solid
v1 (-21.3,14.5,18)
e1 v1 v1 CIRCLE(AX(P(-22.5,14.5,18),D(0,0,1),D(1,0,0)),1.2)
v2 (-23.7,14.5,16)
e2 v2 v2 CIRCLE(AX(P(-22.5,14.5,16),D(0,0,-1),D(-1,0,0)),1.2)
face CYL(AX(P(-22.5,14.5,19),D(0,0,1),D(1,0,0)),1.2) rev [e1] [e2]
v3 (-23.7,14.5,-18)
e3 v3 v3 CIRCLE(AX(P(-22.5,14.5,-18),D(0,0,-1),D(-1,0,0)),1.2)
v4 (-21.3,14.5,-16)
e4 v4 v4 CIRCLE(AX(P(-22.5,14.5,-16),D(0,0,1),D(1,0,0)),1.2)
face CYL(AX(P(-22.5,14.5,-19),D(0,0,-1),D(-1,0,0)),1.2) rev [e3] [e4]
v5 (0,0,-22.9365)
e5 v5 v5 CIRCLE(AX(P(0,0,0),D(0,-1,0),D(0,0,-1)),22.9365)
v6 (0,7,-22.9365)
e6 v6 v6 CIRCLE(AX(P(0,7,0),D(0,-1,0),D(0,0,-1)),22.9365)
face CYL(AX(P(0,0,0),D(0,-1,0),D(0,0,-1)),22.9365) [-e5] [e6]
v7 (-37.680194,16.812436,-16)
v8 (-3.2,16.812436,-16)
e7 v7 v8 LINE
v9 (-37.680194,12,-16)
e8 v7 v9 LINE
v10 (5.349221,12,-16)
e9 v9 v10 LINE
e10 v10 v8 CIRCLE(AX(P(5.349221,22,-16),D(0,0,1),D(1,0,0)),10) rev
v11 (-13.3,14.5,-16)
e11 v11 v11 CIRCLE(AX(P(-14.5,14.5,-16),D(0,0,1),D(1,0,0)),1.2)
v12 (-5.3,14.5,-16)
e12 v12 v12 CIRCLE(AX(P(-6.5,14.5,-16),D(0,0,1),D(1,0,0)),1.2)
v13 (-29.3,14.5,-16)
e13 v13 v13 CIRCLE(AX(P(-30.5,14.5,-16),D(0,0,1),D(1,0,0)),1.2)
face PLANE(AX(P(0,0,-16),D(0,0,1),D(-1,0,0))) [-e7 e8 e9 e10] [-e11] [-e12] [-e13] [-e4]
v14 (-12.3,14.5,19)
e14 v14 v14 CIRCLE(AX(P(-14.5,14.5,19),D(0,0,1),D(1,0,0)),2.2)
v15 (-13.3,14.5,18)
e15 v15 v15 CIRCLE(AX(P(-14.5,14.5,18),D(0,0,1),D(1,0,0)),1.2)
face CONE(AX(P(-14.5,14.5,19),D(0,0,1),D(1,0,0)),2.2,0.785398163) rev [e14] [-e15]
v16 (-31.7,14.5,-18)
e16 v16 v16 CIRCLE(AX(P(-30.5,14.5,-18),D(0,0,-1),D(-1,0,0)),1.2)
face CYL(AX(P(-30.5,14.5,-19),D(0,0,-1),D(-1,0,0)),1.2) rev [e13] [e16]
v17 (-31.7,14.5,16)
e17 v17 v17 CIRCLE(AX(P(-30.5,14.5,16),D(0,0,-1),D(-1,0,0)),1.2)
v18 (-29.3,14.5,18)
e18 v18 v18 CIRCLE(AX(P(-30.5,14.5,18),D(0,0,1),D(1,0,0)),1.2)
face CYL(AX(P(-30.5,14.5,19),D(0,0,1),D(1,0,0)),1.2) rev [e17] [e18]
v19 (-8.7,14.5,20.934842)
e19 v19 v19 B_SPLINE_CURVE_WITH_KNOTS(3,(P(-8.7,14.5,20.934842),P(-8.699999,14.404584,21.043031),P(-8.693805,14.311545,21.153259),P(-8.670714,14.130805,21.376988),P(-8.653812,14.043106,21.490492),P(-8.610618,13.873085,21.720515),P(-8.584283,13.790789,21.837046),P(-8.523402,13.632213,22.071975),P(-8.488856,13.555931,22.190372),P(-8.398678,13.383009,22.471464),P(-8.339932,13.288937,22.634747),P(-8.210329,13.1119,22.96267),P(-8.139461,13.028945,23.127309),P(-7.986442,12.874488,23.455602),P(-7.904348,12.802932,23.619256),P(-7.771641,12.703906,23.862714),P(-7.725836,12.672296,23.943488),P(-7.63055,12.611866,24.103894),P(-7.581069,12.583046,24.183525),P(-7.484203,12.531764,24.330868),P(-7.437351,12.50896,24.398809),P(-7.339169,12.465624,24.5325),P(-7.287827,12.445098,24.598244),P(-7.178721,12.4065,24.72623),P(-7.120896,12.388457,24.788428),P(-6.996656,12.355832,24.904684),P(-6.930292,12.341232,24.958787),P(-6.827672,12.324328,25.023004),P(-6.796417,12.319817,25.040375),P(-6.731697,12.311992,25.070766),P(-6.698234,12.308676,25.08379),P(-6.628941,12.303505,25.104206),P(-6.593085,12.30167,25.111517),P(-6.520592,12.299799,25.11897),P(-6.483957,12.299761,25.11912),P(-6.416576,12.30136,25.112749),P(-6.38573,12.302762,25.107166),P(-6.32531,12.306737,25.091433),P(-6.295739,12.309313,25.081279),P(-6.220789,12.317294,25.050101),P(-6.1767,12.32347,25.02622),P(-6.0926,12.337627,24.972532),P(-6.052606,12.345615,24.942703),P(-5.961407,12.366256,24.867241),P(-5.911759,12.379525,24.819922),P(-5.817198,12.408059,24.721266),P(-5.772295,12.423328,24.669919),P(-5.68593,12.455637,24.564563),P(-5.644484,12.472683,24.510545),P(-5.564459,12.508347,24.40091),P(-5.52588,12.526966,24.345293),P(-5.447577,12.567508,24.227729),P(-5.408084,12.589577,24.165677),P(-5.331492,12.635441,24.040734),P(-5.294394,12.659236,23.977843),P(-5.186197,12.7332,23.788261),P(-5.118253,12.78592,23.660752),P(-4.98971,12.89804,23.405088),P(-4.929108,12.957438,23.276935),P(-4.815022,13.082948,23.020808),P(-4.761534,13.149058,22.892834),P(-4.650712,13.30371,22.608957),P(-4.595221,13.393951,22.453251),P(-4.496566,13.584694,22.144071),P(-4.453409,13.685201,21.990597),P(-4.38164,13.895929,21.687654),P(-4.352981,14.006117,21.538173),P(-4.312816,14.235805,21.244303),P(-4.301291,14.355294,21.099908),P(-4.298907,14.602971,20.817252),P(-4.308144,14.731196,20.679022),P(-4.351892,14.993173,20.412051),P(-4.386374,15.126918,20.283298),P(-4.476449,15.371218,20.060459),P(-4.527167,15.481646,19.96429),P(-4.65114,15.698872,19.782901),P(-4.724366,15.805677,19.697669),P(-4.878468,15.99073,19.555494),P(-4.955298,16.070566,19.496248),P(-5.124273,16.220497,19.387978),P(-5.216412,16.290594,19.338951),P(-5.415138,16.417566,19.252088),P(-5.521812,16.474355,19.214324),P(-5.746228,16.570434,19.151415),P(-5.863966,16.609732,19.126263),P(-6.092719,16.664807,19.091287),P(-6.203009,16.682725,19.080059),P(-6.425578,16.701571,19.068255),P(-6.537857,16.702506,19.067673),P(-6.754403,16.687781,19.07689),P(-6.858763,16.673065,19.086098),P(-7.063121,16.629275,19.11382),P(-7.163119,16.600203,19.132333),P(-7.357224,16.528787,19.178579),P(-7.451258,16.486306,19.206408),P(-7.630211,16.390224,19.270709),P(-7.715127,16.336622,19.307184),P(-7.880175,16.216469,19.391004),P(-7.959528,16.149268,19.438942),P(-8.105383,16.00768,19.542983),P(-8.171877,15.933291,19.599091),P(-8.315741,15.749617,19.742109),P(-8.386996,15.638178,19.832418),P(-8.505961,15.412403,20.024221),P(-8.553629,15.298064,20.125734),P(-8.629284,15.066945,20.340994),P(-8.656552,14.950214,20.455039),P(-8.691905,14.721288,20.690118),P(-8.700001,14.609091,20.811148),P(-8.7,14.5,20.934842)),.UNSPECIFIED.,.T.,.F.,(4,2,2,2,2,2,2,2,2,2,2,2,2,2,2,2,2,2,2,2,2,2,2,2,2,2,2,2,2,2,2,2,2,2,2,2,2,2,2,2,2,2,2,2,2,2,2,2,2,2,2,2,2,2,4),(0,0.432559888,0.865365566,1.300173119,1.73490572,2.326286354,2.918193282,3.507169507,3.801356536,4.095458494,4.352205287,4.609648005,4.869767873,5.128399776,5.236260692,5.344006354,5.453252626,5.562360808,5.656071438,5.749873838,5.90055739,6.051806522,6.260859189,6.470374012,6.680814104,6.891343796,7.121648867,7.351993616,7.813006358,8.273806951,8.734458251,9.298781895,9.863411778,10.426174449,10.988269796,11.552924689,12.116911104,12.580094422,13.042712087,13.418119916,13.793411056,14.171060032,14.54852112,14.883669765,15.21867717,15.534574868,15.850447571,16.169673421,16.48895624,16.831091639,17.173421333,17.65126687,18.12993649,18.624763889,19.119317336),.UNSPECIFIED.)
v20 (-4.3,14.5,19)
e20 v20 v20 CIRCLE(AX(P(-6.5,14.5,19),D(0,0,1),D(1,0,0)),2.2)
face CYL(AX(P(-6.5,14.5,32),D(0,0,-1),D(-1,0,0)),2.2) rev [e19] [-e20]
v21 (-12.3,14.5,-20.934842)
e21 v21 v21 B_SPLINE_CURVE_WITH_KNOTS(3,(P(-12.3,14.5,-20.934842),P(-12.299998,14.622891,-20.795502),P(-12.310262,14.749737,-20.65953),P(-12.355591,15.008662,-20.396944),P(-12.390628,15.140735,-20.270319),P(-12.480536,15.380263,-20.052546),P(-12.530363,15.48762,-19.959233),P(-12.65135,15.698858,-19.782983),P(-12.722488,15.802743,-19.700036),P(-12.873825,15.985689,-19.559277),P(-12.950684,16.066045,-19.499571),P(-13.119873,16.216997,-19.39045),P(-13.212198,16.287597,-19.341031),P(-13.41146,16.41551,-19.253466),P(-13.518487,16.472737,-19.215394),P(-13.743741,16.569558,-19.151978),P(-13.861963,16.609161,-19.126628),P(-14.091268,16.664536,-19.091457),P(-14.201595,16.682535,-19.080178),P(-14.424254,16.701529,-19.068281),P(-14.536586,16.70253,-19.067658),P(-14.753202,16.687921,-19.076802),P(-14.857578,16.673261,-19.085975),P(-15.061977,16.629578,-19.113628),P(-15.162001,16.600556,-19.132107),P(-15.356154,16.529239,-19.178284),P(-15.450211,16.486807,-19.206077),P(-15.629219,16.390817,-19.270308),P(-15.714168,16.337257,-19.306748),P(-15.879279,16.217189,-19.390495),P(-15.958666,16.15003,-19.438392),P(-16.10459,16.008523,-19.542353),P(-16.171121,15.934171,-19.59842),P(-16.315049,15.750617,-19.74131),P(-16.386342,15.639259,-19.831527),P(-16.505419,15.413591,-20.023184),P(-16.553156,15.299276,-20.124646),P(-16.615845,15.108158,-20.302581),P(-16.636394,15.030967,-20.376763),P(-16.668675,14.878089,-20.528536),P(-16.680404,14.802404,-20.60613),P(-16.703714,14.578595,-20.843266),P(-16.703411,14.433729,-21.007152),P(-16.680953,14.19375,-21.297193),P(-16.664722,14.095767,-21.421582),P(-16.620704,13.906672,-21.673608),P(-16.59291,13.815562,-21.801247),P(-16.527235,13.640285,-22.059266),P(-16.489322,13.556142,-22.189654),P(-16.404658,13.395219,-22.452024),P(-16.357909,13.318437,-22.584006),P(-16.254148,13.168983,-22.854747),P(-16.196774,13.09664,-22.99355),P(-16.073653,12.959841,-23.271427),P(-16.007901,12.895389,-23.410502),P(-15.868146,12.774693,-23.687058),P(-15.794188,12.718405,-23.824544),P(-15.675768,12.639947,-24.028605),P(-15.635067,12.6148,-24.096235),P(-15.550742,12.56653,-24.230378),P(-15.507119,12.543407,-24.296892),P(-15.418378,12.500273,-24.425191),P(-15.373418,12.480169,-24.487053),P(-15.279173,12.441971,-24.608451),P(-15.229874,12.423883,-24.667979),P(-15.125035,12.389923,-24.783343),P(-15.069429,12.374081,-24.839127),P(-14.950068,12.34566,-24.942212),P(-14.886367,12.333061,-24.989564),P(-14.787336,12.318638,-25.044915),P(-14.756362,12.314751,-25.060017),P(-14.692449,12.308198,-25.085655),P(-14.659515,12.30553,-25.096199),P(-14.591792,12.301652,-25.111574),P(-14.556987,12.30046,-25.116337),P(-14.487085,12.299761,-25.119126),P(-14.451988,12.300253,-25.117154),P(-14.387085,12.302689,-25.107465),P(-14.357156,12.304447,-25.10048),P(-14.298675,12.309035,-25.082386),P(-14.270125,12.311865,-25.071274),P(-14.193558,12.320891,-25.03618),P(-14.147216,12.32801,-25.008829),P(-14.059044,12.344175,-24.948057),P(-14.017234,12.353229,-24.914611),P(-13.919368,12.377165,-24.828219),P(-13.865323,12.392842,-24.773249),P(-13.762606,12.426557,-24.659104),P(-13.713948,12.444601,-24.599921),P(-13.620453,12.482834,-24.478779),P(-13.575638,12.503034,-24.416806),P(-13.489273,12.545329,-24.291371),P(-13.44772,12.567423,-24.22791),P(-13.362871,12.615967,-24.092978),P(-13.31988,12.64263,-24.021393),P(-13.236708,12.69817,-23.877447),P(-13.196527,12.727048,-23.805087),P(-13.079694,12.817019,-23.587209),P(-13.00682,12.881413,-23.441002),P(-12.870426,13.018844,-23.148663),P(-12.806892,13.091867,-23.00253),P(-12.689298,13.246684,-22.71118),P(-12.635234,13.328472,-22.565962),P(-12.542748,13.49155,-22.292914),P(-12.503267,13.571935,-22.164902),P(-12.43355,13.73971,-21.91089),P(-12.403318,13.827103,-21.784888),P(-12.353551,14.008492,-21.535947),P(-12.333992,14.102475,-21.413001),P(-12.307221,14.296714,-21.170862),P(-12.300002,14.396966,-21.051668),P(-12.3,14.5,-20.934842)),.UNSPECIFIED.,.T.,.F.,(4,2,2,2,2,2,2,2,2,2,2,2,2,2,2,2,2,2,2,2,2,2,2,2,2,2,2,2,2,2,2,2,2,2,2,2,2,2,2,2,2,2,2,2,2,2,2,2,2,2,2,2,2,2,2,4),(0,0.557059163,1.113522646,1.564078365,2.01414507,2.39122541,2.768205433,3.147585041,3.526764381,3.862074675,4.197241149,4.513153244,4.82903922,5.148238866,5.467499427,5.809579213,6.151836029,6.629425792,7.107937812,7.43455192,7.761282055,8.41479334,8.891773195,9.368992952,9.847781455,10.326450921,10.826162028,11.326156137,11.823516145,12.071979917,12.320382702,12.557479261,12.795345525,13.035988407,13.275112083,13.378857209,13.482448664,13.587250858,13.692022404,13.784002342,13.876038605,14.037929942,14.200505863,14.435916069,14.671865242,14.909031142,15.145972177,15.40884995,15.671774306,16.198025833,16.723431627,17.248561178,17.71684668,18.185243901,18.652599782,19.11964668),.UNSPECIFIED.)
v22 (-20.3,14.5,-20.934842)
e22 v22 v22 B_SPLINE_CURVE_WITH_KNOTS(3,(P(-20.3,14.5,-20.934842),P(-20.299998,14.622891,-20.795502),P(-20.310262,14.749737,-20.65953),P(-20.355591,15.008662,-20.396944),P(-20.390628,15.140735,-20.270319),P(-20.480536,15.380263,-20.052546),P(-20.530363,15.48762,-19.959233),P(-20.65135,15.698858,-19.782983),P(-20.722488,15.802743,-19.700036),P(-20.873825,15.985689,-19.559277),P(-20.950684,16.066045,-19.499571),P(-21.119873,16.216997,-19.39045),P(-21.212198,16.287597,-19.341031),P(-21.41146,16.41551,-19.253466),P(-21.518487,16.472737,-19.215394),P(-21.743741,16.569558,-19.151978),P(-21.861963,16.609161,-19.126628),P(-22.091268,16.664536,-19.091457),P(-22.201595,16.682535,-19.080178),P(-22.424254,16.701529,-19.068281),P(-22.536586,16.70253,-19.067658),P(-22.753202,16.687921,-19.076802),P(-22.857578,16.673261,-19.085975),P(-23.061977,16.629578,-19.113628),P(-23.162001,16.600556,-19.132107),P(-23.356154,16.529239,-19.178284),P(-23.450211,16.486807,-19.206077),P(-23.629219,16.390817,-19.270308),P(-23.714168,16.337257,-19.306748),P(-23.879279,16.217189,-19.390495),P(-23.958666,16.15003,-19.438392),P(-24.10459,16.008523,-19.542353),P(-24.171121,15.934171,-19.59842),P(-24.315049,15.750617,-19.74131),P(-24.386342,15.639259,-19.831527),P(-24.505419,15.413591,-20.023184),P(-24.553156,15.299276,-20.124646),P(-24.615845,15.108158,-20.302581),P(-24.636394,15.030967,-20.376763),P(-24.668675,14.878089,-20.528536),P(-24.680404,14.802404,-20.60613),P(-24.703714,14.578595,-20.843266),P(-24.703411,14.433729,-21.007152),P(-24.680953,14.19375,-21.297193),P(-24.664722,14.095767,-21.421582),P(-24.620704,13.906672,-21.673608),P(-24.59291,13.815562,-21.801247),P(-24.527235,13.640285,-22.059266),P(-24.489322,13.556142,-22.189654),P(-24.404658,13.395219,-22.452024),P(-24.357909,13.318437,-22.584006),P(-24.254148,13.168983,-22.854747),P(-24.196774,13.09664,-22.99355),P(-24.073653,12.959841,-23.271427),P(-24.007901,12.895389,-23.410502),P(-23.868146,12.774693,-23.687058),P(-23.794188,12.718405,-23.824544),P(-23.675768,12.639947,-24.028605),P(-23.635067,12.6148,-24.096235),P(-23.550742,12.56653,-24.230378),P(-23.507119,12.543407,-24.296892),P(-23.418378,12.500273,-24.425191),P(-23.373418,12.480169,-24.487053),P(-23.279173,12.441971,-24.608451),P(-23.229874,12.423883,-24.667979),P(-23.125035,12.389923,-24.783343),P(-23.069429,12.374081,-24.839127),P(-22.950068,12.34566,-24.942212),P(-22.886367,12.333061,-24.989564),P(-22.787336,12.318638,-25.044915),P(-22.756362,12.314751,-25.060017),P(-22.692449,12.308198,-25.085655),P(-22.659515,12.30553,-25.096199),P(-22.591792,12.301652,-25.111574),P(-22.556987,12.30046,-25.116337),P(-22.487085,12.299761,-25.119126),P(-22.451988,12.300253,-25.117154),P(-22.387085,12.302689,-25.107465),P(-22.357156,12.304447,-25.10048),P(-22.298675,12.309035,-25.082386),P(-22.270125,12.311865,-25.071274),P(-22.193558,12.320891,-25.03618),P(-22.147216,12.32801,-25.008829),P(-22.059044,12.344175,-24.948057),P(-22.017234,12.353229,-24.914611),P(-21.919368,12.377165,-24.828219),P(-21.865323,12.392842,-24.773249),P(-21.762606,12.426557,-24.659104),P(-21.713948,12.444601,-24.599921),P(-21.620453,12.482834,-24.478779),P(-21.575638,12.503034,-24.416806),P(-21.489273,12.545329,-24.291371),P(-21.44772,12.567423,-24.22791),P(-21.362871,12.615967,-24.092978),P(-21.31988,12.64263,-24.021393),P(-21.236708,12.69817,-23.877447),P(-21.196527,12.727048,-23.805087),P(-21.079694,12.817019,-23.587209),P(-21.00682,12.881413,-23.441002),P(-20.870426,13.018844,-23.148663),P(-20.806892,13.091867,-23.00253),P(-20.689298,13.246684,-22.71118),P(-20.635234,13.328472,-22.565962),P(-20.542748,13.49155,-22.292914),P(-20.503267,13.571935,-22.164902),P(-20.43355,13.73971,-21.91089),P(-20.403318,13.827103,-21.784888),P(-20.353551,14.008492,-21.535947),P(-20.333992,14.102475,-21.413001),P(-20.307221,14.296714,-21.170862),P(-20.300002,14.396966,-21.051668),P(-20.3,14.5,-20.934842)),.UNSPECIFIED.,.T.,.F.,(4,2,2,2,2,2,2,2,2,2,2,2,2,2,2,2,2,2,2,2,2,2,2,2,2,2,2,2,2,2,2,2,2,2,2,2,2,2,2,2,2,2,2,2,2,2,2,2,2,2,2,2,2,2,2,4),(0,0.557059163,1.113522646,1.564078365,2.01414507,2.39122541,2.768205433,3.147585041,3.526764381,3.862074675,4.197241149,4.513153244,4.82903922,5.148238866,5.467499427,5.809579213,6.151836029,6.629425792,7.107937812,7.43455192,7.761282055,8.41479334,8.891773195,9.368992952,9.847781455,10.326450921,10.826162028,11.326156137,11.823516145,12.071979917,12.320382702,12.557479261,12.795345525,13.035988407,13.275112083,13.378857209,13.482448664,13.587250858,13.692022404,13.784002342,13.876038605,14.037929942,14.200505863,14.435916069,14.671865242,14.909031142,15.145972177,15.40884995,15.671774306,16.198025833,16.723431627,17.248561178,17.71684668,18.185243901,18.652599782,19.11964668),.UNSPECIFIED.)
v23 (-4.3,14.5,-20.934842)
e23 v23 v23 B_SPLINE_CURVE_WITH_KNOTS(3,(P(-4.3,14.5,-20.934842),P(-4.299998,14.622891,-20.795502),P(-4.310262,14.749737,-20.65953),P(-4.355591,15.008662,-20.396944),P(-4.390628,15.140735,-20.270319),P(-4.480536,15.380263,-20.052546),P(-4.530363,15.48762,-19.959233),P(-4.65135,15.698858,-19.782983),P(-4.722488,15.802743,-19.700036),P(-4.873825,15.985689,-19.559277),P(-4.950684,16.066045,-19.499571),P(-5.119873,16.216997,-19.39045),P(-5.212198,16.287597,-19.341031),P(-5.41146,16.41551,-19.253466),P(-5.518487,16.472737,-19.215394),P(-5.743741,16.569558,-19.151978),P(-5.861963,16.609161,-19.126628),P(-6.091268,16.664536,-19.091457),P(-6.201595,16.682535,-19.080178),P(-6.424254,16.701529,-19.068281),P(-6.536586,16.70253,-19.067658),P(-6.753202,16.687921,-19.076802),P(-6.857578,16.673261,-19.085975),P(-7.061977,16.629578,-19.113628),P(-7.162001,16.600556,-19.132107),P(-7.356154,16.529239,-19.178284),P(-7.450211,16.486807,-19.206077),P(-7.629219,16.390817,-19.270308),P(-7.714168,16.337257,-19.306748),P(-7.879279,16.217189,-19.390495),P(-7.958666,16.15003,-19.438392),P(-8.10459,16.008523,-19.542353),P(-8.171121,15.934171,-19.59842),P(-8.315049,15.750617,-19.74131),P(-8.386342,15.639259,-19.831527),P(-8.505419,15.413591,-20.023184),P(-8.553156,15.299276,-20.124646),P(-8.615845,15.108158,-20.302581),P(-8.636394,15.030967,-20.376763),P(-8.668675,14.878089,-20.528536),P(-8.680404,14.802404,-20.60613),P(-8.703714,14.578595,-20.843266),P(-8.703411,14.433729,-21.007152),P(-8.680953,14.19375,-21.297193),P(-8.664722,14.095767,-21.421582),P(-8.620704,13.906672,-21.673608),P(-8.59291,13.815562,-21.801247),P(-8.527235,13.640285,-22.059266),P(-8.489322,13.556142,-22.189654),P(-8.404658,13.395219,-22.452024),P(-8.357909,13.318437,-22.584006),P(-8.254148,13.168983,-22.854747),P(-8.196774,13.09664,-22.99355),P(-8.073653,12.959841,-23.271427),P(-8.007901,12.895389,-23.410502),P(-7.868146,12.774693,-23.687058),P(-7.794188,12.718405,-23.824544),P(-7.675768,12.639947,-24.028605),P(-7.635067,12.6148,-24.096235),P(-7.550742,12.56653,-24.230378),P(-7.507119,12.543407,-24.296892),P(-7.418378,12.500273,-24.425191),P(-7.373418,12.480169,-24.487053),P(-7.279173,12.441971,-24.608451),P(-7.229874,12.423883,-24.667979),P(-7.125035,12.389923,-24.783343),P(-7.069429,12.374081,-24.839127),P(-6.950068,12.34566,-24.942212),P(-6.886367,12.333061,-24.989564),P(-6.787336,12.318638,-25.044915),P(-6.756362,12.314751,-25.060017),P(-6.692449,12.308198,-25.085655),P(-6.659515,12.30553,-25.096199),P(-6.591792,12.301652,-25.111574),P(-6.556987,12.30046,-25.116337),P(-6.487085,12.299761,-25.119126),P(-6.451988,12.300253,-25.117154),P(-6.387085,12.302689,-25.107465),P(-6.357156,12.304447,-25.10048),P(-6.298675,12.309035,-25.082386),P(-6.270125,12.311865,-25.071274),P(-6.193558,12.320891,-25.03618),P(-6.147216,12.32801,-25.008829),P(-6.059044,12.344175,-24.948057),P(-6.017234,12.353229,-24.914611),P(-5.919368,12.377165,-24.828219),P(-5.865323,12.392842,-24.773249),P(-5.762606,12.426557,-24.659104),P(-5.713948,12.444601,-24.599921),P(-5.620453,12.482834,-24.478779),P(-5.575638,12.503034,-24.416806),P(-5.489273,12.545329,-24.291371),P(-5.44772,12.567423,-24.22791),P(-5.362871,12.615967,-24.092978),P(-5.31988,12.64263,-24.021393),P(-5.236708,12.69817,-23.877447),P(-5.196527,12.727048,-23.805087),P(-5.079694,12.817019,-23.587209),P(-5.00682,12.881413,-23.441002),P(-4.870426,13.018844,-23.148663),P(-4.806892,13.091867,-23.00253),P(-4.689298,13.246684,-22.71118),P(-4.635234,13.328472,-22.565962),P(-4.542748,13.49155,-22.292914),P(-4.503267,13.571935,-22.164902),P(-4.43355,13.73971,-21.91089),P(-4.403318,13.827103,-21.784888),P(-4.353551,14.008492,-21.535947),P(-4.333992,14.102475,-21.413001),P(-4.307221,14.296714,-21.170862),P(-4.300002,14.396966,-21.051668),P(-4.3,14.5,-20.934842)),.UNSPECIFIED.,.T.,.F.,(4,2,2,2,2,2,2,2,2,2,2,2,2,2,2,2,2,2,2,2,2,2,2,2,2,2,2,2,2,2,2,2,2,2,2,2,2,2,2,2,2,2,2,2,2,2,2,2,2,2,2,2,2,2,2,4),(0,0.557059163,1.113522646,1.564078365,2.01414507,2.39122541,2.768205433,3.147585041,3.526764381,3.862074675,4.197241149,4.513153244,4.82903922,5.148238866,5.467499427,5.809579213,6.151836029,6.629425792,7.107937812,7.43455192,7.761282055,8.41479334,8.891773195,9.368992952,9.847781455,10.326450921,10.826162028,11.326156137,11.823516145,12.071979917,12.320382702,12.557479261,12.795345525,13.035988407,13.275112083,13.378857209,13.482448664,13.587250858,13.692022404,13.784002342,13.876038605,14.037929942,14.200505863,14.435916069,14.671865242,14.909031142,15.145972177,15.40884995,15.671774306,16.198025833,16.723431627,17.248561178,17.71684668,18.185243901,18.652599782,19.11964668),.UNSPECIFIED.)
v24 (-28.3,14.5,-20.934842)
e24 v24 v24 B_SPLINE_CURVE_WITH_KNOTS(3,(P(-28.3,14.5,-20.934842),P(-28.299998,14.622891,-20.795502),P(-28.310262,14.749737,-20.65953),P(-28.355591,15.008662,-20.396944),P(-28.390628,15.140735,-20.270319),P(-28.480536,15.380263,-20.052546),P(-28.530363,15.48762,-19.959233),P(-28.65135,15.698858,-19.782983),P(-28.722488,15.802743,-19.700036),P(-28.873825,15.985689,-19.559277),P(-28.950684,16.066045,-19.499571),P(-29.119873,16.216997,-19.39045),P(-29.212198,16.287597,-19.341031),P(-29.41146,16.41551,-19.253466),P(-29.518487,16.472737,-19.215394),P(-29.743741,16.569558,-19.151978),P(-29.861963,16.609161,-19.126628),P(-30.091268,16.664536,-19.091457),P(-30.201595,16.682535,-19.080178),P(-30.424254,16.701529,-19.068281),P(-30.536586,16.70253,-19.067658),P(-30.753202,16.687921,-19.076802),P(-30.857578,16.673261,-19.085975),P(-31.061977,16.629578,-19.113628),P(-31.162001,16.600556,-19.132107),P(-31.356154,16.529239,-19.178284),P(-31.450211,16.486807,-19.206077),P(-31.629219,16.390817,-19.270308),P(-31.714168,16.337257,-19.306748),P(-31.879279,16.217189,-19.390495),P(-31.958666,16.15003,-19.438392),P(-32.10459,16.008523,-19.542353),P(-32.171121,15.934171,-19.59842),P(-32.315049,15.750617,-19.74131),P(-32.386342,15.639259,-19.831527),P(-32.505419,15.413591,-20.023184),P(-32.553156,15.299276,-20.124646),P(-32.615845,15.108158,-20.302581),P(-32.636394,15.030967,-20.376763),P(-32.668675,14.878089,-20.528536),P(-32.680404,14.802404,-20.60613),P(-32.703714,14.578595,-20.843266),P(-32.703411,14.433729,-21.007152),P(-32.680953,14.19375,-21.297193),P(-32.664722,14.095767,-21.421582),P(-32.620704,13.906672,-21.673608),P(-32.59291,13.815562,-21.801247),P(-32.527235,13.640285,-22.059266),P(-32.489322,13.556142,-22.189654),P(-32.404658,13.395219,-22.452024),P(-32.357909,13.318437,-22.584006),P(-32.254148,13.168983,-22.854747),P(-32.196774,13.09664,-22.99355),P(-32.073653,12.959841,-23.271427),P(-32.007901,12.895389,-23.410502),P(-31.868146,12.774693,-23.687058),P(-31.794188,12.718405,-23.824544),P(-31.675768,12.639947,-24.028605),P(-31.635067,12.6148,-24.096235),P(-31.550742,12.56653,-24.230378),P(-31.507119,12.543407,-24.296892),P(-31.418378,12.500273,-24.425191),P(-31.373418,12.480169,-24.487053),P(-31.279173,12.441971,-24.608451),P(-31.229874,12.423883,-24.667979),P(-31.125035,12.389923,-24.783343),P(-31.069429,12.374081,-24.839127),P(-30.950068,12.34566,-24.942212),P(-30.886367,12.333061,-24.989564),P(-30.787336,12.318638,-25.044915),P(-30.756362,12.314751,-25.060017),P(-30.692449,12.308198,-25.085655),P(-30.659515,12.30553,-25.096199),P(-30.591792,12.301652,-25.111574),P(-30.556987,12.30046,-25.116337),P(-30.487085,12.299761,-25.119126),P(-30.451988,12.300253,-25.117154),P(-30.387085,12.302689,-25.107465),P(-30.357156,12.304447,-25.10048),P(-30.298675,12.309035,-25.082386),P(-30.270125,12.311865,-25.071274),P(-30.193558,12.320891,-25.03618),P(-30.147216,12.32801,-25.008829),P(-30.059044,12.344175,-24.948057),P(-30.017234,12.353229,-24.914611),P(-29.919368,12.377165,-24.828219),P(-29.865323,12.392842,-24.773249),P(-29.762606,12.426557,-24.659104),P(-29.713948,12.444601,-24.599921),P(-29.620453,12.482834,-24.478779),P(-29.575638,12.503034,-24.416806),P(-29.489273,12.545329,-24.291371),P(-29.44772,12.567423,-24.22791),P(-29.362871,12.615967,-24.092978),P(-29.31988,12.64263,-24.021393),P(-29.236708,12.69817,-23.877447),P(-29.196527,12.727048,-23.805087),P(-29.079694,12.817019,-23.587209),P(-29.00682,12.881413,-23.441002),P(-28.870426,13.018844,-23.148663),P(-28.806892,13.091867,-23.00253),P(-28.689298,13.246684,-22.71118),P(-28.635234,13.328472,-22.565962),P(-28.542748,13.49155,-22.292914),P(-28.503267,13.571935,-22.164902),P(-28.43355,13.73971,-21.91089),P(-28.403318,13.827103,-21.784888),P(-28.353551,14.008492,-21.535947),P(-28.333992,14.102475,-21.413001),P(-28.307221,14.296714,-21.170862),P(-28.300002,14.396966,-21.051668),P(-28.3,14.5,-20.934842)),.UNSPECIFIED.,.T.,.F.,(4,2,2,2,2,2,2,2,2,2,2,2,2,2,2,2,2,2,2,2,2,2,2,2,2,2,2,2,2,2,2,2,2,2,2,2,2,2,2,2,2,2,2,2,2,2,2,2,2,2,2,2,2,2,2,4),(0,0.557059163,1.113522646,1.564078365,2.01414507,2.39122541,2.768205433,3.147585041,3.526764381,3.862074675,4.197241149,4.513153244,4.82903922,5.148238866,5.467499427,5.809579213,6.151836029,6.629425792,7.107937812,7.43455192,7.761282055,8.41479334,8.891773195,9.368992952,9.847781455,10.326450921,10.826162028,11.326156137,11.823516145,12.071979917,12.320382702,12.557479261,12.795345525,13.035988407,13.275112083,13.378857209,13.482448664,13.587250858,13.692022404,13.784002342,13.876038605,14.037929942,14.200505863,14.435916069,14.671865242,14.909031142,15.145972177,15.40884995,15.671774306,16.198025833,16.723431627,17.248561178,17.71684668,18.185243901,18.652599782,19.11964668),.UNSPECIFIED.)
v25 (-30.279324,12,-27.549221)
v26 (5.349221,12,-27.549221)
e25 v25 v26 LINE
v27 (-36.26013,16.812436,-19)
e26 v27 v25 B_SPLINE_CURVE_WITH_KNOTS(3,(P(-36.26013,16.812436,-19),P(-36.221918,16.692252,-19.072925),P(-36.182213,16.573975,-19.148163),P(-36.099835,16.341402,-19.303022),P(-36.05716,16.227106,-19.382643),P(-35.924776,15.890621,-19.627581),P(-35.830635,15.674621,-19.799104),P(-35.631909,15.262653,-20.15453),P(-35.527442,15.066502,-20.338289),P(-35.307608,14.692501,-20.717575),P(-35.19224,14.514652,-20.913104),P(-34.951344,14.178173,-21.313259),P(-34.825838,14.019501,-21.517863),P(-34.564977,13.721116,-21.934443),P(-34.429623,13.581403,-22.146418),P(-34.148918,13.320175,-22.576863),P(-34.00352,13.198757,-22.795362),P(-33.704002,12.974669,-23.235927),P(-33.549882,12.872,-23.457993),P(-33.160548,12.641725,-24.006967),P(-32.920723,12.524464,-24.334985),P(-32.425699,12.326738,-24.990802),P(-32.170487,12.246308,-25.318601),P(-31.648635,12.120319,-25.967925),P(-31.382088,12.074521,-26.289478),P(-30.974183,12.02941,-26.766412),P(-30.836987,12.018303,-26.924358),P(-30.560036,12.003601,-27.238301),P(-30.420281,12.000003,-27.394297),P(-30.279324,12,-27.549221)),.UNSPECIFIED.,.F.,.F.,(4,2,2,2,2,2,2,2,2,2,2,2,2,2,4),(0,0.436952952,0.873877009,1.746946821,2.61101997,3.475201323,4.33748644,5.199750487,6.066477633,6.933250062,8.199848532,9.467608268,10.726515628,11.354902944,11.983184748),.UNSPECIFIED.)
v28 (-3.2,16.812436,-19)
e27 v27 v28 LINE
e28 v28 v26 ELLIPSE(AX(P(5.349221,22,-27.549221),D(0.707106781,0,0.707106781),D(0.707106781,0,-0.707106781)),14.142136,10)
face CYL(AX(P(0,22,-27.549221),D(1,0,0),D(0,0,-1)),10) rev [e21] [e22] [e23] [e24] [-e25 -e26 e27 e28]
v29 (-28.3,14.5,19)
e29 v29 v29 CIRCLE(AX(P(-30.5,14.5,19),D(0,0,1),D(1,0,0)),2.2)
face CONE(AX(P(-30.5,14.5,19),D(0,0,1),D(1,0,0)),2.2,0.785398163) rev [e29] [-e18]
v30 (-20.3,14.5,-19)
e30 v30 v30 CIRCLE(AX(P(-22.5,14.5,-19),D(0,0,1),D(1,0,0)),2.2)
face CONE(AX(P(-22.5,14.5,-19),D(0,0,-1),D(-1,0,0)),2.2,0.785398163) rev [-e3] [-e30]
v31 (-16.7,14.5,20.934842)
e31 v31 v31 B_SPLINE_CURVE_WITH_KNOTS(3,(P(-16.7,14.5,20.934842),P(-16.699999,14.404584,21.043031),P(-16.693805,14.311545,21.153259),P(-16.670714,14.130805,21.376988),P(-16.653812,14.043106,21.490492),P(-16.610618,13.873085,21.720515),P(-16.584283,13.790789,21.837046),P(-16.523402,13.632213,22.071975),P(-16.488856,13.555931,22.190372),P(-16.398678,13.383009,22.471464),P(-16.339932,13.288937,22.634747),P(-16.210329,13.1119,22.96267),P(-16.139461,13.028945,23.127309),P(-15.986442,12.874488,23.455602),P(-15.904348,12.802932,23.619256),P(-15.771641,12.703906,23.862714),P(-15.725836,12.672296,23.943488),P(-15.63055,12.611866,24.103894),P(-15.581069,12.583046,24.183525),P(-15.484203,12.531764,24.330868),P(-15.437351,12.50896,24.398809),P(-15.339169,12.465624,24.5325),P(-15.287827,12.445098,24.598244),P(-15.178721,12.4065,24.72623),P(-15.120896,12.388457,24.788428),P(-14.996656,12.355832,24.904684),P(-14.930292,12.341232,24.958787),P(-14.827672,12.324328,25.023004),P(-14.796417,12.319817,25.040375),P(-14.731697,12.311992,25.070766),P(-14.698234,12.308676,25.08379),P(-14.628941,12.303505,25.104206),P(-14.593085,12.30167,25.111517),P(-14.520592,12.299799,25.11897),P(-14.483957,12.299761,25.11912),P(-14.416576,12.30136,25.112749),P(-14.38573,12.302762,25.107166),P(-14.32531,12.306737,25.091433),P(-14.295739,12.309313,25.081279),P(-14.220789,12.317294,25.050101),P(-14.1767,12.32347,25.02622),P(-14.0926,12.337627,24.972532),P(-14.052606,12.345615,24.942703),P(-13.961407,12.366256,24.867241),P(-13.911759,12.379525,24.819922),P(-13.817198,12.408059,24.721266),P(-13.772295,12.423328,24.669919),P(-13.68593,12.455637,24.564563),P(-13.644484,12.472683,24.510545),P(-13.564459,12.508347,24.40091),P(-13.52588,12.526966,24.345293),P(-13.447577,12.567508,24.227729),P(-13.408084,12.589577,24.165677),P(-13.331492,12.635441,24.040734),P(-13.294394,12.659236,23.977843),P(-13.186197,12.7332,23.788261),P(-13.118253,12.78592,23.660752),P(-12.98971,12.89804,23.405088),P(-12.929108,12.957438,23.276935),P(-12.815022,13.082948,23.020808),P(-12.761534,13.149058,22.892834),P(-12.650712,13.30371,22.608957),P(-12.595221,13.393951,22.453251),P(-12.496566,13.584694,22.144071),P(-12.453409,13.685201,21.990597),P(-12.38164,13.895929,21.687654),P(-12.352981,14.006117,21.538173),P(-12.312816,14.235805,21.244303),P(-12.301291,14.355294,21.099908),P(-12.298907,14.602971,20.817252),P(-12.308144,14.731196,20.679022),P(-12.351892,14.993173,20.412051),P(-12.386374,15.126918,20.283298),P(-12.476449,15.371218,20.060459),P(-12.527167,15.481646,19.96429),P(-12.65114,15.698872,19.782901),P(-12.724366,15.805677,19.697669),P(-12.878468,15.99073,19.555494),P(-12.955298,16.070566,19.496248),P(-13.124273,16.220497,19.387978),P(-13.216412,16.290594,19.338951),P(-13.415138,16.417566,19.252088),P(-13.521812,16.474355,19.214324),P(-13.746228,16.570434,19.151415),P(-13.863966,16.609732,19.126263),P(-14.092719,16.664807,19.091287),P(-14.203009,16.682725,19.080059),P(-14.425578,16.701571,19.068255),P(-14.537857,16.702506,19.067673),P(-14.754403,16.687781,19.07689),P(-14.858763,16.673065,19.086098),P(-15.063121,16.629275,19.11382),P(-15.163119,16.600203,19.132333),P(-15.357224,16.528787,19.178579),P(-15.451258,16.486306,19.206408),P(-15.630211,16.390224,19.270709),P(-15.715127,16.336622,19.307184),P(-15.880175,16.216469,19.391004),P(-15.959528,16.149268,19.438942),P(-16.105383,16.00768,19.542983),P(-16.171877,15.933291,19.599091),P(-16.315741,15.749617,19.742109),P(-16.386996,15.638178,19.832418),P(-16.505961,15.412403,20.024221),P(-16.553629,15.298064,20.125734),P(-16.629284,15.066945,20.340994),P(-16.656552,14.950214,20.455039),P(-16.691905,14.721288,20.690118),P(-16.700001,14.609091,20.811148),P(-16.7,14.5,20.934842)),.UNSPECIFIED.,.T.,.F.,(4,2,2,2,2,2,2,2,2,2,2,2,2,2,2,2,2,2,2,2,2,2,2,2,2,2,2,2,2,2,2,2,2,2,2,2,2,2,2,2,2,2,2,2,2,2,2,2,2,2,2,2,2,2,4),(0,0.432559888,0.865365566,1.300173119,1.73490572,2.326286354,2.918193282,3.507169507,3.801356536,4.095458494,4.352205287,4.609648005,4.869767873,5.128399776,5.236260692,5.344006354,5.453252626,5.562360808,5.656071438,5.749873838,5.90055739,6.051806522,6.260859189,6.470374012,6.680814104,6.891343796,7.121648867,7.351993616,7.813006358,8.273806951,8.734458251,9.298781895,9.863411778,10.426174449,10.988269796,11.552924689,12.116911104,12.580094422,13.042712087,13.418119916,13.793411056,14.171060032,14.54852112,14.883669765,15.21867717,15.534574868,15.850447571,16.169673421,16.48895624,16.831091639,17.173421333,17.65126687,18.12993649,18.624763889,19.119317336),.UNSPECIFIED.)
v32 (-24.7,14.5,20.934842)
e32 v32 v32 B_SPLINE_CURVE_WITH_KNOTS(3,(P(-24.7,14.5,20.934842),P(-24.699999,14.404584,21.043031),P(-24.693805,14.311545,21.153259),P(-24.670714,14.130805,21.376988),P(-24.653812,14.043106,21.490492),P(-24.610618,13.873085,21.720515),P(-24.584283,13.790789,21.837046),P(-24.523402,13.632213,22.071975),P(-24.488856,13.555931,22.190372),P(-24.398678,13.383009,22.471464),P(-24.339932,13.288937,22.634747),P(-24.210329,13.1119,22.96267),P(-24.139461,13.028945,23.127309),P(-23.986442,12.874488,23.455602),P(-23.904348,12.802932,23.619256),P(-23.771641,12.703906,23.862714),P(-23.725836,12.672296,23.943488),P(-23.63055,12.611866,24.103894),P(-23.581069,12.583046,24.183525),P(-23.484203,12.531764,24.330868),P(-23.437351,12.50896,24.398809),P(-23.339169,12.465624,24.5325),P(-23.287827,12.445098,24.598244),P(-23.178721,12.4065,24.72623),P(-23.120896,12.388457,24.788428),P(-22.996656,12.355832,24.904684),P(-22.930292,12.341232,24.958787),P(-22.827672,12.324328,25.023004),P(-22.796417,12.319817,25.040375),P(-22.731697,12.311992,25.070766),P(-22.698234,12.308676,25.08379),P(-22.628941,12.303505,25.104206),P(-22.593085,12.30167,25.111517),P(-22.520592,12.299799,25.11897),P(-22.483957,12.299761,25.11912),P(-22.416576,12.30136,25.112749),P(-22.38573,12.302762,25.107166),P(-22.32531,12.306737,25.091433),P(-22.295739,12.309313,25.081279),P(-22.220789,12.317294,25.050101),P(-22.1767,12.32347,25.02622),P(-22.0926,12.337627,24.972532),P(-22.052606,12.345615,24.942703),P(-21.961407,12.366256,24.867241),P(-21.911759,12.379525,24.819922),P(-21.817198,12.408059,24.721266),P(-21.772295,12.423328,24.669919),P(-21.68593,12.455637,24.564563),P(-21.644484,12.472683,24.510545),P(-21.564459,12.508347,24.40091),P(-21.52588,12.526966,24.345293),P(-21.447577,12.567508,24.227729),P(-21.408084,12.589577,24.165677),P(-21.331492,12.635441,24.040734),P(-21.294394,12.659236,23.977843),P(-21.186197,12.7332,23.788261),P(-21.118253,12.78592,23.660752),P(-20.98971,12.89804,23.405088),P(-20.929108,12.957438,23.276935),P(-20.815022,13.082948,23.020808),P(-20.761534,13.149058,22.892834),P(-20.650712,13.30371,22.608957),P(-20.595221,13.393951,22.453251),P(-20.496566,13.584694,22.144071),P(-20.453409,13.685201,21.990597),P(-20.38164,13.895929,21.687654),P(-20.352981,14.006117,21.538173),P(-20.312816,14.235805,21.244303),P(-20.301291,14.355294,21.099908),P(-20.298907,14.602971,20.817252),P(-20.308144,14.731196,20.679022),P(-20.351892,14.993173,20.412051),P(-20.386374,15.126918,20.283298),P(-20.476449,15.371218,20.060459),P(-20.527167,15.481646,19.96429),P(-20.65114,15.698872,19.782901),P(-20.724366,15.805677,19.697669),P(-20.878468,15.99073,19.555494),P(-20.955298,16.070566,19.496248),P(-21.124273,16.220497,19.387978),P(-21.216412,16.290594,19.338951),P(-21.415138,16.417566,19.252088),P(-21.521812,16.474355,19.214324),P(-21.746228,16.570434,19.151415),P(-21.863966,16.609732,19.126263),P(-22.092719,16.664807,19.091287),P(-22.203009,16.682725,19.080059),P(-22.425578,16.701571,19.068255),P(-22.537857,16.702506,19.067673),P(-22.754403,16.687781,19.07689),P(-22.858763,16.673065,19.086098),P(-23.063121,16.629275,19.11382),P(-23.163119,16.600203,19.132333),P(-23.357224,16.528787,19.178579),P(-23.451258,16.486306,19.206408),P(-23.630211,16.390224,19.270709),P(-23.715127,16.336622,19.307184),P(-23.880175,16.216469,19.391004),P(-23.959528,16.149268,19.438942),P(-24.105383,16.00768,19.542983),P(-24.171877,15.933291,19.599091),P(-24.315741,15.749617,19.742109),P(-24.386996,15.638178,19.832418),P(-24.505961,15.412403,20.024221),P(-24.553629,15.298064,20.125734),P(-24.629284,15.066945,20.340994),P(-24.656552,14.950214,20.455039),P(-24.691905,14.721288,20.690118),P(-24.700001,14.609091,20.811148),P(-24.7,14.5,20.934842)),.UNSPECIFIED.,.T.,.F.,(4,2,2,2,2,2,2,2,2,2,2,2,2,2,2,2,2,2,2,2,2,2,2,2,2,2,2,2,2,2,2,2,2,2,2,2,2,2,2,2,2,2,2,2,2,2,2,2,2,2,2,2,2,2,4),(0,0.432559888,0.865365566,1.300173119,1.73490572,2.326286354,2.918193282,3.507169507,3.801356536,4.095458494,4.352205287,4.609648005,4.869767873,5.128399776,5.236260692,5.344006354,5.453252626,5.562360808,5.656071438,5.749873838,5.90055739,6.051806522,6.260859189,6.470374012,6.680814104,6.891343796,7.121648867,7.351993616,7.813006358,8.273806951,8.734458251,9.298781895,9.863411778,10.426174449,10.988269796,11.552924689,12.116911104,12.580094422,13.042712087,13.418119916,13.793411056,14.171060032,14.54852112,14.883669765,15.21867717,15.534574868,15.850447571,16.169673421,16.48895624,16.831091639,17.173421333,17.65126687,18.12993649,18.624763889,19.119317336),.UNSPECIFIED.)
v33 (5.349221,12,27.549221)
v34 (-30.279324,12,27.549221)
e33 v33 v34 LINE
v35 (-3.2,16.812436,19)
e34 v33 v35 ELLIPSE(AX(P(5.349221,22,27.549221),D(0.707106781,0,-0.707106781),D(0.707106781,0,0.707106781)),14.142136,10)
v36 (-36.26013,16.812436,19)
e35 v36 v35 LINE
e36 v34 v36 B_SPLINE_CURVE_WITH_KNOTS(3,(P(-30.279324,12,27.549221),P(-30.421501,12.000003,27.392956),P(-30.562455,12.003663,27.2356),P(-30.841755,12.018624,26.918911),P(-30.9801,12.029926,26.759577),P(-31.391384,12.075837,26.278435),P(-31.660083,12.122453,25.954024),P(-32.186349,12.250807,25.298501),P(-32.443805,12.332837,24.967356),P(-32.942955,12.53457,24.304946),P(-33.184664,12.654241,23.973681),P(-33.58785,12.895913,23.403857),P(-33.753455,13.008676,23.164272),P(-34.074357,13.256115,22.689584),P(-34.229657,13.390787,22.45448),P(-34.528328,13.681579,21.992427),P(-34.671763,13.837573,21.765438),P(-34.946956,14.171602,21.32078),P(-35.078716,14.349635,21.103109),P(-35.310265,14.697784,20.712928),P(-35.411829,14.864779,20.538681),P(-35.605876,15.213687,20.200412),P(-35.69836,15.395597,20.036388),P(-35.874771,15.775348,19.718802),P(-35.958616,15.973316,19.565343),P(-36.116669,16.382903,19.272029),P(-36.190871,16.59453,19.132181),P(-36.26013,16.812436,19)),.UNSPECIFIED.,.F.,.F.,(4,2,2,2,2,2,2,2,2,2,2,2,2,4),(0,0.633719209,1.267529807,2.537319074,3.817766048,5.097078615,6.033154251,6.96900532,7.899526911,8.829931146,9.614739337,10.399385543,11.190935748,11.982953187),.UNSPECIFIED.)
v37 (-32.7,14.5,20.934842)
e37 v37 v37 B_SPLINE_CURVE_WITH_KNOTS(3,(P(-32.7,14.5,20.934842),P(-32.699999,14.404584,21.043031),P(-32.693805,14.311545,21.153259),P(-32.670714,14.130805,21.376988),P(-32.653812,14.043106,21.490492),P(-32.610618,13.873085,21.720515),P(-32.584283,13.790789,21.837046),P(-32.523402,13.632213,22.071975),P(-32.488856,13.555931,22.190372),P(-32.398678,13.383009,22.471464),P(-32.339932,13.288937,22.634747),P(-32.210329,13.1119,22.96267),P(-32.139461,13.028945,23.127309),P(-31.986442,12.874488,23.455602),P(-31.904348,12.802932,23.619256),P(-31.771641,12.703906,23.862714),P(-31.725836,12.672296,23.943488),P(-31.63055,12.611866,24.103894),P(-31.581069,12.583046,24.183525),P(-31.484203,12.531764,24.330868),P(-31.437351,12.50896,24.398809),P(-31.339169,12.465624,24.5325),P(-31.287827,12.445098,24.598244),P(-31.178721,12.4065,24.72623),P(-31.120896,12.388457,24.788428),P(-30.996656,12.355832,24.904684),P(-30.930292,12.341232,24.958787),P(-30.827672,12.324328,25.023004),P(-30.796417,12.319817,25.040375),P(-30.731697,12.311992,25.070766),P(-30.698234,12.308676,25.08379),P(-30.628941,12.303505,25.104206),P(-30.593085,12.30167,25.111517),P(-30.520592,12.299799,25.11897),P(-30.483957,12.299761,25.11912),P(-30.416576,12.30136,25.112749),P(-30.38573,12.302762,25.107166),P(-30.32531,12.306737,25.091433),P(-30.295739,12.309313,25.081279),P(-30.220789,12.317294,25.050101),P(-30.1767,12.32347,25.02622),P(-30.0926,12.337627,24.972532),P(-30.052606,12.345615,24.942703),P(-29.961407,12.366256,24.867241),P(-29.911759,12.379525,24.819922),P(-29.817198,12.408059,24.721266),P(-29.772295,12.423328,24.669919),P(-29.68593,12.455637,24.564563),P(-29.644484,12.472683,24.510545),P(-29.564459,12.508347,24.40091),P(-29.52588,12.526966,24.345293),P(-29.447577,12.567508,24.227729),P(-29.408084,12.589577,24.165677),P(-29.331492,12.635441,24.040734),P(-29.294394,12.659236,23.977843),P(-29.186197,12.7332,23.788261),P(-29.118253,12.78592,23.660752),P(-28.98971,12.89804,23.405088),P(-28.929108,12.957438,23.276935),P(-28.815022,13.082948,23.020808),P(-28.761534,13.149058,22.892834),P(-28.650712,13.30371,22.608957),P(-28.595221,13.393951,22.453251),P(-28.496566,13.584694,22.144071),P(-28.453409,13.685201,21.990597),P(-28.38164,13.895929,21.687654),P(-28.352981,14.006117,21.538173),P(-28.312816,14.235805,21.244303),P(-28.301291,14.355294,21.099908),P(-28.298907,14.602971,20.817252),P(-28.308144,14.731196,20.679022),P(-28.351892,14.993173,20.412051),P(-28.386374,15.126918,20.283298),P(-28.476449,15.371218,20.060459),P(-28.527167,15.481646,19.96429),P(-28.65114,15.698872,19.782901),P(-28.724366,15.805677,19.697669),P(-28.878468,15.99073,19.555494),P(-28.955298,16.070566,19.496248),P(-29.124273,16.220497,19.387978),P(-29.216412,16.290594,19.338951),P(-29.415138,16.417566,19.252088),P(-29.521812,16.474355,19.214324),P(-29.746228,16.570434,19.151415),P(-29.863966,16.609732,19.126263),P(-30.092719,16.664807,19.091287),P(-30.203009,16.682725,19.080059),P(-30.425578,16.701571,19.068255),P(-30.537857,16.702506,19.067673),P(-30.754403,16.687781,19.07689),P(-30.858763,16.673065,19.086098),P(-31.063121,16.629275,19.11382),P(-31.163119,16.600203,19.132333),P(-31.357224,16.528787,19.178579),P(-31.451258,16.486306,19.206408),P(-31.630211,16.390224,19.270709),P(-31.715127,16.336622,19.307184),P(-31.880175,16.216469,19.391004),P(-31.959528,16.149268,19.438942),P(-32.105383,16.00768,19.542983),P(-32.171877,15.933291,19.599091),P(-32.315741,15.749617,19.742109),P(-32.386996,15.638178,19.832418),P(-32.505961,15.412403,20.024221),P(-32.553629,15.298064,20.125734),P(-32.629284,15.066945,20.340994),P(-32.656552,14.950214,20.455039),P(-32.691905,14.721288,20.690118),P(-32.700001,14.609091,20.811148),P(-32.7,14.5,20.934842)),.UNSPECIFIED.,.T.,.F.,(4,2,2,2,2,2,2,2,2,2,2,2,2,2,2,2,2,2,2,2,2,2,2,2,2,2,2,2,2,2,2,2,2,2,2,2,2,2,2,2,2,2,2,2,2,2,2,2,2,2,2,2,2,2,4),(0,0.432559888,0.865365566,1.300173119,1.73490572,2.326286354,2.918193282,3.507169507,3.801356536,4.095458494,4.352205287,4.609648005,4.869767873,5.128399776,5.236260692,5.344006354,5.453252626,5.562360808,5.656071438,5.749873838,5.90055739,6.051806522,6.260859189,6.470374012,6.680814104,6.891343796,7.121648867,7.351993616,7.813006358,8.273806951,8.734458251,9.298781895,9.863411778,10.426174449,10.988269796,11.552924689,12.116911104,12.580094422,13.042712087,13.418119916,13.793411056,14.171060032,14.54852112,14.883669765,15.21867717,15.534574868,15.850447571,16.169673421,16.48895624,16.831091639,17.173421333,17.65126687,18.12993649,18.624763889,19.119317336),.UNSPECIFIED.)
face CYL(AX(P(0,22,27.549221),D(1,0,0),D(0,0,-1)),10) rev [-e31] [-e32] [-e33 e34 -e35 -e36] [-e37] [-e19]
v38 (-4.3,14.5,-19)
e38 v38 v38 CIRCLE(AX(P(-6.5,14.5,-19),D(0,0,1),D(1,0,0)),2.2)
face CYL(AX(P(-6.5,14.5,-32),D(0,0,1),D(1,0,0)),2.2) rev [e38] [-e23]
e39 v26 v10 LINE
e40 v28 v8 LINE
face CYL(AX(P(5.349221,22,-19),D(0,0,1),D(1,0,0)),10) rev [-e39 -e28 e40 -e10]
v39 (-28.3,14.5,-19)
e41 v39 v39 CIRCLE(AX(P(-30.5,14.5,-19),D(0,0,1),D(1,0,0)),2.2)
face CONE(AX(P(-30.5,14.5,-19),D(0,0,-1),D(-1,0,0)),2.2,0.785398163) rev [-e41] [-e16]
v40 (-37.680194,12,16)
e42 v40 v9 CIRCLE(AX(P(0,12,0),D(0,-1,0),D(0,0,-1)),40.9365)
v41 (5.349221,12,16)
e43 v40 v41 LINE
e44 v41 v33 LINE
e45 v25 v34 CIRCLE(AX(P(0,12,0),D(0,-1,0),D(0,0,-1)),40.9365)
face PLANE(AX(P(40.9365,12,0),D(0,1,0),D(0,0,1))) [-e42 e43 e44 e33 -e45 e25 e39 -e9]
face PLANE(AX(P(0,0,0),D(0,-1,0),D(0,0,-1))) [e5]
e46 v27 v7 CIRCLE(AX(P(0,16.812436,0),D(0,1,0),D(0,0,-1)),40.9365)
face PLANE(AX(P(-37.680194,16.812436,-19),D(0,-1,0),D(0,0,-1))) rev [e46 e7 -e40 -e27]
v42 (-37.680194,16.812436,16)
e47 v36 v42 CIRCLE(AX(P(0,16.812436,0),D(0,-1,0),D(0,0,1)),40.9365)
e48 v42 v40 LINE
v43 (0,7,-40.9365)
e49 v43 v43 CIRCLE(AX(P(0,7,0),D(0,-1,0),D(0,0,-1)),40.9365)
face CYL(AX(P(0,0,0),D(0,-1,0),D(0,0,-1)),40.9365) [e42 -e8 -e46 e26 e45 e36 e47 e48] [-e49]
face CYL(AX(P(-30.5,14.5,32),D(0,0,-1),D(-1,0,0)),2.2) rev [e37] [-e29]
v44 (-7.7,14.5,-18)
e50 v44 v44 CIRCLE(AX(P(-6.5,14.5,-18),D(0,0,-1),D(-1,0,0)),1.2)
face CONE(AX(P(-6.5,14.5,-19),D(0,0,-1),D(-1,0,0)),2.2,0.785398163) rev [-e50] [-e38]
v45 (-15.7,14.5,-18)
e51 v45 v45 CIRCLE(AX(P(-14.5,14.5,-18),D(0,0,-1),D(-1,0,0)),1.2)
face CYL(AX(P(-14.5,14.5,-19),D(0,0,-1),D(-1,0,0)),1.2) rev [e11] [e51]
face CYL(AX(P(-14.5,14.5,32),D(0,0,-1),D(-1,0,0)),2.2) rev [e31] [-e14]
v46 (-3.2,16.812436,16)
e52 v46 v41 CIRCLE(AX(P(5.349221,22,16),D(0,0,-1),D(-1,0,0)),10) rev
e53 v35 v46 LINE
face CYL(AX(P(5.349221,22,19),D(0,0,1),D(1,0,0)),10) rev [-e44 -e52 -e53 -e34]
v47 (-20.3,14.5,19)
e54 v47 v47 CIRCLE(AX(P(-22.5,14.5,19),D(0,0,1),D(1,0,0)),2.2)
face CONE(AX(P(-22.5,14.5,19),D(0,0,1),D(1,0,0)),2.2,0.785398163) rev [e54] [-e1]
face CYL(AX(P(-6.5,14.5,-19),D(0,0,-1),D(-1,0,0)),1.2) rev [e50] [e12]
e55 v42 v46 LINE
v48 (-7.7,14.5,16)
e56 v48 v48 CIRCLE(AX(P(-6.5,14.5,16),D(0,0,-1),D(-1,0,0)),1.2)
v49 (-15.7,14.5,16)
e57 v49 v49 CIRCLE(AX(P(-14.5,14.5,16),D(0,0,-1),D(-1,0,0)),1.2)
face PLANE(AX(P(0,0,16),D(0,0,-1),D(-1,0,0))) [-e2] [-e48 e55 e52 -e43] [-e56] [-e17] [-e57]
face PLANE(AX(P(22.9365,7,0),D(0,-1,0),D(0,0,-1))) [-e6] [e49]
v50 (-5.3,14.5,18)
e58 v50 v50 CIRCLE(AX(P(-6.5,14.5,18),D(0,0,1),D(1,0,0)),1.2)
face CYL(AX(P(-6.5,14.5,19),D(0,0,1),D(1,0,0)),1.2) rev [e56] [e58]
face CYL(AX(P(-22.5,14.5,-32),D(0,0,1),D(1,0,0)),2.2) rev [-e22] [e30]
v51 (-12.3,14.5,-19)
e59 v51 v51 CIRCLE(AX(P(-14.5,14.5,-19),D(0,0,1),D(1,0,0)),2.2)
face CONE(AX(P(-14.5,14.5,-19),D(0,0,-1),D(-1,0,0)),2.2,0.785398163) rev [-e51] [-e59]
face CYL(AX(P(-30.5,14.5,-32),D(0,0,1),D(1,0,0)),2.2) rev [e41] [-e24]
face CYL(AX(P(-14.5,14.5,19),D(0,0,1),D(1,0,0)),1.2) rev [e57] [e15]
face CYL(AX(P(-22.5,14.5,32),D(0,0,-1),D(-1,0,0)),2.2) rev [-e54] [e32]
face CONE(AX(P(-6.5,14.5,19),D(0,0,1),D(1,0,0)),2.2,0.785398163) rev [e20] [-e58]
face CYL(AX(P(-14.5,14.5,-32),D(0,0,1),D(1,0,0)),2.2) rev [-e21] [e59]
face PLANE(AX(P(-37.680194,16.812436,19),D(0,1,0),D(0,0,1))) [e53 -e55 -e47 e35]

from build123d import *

# Parameters (mm, degrees)
SKETCH2_W           = 34.480194164
SKETCH2_H           = 4.812435565
BOSS_EXTRUDE1_DEPTH = 3
FILLET1_R           = 10
SKETCH8_R           = 2.2
CUT_EXTRUDE1_DEPTH  = 13
LPATTERN1_COUNT     = 4
LPATTERN1_PITCH     = 8
CUT_EXTRUDE2_DEPTH  = 13
FILLET2_START       = 16
FILLET2_DEPTH       = 11.549220739
FILLET2_START_2     = -3.2
FILLET2_2_DEPTH     = 8.549220739


with BuildPart() as part:
    # Sketch1 → Revolve1 (revolve)
    with BuildSketch(Plane.XY, mode=Mode.PRIVATE) as revolve1_sk:
        Polygon((0, 0), (22.9365, 0), (22.9365, 7), (40.9365, 7), (40.9365, 12), (0, 12), align=None)
    revolve(revolve1_sk.sketch.rotate(Axis((0, 0, 0), (0, 1, 0)), 90), axis=Axis((0, 0, 0), (0, 1, 0)))

    # Sketch2 → Boss-Extrude1 (add)
    with BuildSketch(Plane.XY.offset(16)):
        with Locations((-20.440097082, 14.406217783)):
            Rectangle(SKETCH2_W, SKETCH2_H)
    extrude(amount=BOSS_EXTRUDE1_DEPTH)

    # Fillet1
    # the kernel refuses this fillet: 10 mm, written as the material it adds along each edge
    with BuildSketch(Plane(origin=(-3.2, 12, 19), x_dir=(0, 0, 1), z_dir=(-1, 0, 0))) as fillet1_piece_1_section:
        with BuildLine():
            CenterArc((8.549220739, 10), FILLET1_R, 211.248873094, 58.751126906)
            Line((0, 4.812435565), (0, 0))
            Line((0, 0), (8.549220739, 0))
        make_face()
    fillet1_piece_1 = extrude(amount=54.43318191, mode=Mode.PRIVATE)
    fillet1_piece_1 = fillet1_piece_1 & Plane(origin=(0, 12, 0), x_dir=(0, 0, -1), z_dir=(0, 1, 0)) * Cylinder(40.9365, 144, mode=Mode.PRIVATE)
    add(fillet1_piece_1)

    # Sketch7 → CSK for M2 Countersunk Flat Head Screw2 (revolve, cut)
    with BuildSketch(Plane(origin=(-30.5, 14.5, 19), x_dir=(0, -1, 0), z_dir=(1, 0, 0))):
        Polygon((0, 0), (0, 59.9365), (1.2, 59.9365), (1.2, 1), (2.2, 0), align=None)
    csk_for_m2_countersunk_flat_head_screw2 = revolve(axis=Axis((-30.5, 14.5, 25.35), (0, 0, -1)), mode=Mode.SUBTRACT)

    # Sketch8 → Cut-Extrude1 (cut)
    with BuildSketch(Plane.XY.offset(19)):
        with Locations(Location((-30.5, 14.5, 0), (0, 0, 180))):
            Circle(SKETCH8_R)
    cut_extrude1 = extrude(amount=CUT_EXTRUDE1_DEPTH, mode=Mode.SUBTRACT)

    # LPattern1: CSK for M2 Countersunk Flat Head Screw2, Cut-Extrude1 ×4
    with Locations(*[(i * LPATTERN1_PITCH, 0, 0) for i in range(1, LPATTERN1_COUNT)]):
        add(csk_for_m2_countersunk_flat_head_screw2, mode=Mode.SUBTRACT)
        add(cut_extrude1, mode=Mode.SUBTRACT)

    # Sketch10 → Cut-Extrude2 (cut)
    with BuildSketch(Plane(origin=(0, 16.812435565, 0), x_dir=(1, 0, 0), z_dir=(0, 1, 0))):
        with BuildLine():
            Line((-37.680194164, -19), (-36.260130064, -19))
            ThreePointArc((-36.260130064, -19), (-37.000579546, -17.514398234), (-37.680194164, -16))
            Line((-37.680194164, -16), (-37.680194164, -19))
        make_face()
    extrude(amount=-CUT_EXTRUDE2_DEPTH, mode=Mode.SUBTRACT)

    # Fillet2: read off the stored shape, not the designer's step
    # Fillet2 outline → Fillet2 (add)
    with BuildSketch(Plane.XY.offset(FILLET2_START)):
        with BuildLine():
            ThreePointArc((5.349220739, 12), (0.443899361, 13.285768986), (-3.2, 16.812435565))
            Line((-3.2, 16.812435565), (-3.2, 12))
            Line((-3.2, 12), (5.349220739, 12))
        make_face()
    extrude(amount=FILLET2_DEPTH)

    # Fillet2 2 outline → Fillet2 2 (cut)
    with BuildSketch(Plane.YZ.offset(FILLET2_START_2)):
        with BuildLine():
            Line((18, 27.549220739), (12, 27.549220739))
            ThreePointArc((12, 27.549220739), (13.285768986, 22.643899361), (16.812435565, 19))
            Line((16.812435565, 19), (18, 18.279400168))
            Line((18, 18.279400168), (18, 27.549220739))
        make_face()
    extrude(amount=FILLET2_2_DEPTH, mode=Mode.SUBTRACT)

    # Mirror1: read off the stored shape, not the designer's step
    # Mirror1: part across plane


with BuildPart() as part_1:
    add(part.part)
    add(part.part.mirror(Plane.XY))


solid = part_1.part
